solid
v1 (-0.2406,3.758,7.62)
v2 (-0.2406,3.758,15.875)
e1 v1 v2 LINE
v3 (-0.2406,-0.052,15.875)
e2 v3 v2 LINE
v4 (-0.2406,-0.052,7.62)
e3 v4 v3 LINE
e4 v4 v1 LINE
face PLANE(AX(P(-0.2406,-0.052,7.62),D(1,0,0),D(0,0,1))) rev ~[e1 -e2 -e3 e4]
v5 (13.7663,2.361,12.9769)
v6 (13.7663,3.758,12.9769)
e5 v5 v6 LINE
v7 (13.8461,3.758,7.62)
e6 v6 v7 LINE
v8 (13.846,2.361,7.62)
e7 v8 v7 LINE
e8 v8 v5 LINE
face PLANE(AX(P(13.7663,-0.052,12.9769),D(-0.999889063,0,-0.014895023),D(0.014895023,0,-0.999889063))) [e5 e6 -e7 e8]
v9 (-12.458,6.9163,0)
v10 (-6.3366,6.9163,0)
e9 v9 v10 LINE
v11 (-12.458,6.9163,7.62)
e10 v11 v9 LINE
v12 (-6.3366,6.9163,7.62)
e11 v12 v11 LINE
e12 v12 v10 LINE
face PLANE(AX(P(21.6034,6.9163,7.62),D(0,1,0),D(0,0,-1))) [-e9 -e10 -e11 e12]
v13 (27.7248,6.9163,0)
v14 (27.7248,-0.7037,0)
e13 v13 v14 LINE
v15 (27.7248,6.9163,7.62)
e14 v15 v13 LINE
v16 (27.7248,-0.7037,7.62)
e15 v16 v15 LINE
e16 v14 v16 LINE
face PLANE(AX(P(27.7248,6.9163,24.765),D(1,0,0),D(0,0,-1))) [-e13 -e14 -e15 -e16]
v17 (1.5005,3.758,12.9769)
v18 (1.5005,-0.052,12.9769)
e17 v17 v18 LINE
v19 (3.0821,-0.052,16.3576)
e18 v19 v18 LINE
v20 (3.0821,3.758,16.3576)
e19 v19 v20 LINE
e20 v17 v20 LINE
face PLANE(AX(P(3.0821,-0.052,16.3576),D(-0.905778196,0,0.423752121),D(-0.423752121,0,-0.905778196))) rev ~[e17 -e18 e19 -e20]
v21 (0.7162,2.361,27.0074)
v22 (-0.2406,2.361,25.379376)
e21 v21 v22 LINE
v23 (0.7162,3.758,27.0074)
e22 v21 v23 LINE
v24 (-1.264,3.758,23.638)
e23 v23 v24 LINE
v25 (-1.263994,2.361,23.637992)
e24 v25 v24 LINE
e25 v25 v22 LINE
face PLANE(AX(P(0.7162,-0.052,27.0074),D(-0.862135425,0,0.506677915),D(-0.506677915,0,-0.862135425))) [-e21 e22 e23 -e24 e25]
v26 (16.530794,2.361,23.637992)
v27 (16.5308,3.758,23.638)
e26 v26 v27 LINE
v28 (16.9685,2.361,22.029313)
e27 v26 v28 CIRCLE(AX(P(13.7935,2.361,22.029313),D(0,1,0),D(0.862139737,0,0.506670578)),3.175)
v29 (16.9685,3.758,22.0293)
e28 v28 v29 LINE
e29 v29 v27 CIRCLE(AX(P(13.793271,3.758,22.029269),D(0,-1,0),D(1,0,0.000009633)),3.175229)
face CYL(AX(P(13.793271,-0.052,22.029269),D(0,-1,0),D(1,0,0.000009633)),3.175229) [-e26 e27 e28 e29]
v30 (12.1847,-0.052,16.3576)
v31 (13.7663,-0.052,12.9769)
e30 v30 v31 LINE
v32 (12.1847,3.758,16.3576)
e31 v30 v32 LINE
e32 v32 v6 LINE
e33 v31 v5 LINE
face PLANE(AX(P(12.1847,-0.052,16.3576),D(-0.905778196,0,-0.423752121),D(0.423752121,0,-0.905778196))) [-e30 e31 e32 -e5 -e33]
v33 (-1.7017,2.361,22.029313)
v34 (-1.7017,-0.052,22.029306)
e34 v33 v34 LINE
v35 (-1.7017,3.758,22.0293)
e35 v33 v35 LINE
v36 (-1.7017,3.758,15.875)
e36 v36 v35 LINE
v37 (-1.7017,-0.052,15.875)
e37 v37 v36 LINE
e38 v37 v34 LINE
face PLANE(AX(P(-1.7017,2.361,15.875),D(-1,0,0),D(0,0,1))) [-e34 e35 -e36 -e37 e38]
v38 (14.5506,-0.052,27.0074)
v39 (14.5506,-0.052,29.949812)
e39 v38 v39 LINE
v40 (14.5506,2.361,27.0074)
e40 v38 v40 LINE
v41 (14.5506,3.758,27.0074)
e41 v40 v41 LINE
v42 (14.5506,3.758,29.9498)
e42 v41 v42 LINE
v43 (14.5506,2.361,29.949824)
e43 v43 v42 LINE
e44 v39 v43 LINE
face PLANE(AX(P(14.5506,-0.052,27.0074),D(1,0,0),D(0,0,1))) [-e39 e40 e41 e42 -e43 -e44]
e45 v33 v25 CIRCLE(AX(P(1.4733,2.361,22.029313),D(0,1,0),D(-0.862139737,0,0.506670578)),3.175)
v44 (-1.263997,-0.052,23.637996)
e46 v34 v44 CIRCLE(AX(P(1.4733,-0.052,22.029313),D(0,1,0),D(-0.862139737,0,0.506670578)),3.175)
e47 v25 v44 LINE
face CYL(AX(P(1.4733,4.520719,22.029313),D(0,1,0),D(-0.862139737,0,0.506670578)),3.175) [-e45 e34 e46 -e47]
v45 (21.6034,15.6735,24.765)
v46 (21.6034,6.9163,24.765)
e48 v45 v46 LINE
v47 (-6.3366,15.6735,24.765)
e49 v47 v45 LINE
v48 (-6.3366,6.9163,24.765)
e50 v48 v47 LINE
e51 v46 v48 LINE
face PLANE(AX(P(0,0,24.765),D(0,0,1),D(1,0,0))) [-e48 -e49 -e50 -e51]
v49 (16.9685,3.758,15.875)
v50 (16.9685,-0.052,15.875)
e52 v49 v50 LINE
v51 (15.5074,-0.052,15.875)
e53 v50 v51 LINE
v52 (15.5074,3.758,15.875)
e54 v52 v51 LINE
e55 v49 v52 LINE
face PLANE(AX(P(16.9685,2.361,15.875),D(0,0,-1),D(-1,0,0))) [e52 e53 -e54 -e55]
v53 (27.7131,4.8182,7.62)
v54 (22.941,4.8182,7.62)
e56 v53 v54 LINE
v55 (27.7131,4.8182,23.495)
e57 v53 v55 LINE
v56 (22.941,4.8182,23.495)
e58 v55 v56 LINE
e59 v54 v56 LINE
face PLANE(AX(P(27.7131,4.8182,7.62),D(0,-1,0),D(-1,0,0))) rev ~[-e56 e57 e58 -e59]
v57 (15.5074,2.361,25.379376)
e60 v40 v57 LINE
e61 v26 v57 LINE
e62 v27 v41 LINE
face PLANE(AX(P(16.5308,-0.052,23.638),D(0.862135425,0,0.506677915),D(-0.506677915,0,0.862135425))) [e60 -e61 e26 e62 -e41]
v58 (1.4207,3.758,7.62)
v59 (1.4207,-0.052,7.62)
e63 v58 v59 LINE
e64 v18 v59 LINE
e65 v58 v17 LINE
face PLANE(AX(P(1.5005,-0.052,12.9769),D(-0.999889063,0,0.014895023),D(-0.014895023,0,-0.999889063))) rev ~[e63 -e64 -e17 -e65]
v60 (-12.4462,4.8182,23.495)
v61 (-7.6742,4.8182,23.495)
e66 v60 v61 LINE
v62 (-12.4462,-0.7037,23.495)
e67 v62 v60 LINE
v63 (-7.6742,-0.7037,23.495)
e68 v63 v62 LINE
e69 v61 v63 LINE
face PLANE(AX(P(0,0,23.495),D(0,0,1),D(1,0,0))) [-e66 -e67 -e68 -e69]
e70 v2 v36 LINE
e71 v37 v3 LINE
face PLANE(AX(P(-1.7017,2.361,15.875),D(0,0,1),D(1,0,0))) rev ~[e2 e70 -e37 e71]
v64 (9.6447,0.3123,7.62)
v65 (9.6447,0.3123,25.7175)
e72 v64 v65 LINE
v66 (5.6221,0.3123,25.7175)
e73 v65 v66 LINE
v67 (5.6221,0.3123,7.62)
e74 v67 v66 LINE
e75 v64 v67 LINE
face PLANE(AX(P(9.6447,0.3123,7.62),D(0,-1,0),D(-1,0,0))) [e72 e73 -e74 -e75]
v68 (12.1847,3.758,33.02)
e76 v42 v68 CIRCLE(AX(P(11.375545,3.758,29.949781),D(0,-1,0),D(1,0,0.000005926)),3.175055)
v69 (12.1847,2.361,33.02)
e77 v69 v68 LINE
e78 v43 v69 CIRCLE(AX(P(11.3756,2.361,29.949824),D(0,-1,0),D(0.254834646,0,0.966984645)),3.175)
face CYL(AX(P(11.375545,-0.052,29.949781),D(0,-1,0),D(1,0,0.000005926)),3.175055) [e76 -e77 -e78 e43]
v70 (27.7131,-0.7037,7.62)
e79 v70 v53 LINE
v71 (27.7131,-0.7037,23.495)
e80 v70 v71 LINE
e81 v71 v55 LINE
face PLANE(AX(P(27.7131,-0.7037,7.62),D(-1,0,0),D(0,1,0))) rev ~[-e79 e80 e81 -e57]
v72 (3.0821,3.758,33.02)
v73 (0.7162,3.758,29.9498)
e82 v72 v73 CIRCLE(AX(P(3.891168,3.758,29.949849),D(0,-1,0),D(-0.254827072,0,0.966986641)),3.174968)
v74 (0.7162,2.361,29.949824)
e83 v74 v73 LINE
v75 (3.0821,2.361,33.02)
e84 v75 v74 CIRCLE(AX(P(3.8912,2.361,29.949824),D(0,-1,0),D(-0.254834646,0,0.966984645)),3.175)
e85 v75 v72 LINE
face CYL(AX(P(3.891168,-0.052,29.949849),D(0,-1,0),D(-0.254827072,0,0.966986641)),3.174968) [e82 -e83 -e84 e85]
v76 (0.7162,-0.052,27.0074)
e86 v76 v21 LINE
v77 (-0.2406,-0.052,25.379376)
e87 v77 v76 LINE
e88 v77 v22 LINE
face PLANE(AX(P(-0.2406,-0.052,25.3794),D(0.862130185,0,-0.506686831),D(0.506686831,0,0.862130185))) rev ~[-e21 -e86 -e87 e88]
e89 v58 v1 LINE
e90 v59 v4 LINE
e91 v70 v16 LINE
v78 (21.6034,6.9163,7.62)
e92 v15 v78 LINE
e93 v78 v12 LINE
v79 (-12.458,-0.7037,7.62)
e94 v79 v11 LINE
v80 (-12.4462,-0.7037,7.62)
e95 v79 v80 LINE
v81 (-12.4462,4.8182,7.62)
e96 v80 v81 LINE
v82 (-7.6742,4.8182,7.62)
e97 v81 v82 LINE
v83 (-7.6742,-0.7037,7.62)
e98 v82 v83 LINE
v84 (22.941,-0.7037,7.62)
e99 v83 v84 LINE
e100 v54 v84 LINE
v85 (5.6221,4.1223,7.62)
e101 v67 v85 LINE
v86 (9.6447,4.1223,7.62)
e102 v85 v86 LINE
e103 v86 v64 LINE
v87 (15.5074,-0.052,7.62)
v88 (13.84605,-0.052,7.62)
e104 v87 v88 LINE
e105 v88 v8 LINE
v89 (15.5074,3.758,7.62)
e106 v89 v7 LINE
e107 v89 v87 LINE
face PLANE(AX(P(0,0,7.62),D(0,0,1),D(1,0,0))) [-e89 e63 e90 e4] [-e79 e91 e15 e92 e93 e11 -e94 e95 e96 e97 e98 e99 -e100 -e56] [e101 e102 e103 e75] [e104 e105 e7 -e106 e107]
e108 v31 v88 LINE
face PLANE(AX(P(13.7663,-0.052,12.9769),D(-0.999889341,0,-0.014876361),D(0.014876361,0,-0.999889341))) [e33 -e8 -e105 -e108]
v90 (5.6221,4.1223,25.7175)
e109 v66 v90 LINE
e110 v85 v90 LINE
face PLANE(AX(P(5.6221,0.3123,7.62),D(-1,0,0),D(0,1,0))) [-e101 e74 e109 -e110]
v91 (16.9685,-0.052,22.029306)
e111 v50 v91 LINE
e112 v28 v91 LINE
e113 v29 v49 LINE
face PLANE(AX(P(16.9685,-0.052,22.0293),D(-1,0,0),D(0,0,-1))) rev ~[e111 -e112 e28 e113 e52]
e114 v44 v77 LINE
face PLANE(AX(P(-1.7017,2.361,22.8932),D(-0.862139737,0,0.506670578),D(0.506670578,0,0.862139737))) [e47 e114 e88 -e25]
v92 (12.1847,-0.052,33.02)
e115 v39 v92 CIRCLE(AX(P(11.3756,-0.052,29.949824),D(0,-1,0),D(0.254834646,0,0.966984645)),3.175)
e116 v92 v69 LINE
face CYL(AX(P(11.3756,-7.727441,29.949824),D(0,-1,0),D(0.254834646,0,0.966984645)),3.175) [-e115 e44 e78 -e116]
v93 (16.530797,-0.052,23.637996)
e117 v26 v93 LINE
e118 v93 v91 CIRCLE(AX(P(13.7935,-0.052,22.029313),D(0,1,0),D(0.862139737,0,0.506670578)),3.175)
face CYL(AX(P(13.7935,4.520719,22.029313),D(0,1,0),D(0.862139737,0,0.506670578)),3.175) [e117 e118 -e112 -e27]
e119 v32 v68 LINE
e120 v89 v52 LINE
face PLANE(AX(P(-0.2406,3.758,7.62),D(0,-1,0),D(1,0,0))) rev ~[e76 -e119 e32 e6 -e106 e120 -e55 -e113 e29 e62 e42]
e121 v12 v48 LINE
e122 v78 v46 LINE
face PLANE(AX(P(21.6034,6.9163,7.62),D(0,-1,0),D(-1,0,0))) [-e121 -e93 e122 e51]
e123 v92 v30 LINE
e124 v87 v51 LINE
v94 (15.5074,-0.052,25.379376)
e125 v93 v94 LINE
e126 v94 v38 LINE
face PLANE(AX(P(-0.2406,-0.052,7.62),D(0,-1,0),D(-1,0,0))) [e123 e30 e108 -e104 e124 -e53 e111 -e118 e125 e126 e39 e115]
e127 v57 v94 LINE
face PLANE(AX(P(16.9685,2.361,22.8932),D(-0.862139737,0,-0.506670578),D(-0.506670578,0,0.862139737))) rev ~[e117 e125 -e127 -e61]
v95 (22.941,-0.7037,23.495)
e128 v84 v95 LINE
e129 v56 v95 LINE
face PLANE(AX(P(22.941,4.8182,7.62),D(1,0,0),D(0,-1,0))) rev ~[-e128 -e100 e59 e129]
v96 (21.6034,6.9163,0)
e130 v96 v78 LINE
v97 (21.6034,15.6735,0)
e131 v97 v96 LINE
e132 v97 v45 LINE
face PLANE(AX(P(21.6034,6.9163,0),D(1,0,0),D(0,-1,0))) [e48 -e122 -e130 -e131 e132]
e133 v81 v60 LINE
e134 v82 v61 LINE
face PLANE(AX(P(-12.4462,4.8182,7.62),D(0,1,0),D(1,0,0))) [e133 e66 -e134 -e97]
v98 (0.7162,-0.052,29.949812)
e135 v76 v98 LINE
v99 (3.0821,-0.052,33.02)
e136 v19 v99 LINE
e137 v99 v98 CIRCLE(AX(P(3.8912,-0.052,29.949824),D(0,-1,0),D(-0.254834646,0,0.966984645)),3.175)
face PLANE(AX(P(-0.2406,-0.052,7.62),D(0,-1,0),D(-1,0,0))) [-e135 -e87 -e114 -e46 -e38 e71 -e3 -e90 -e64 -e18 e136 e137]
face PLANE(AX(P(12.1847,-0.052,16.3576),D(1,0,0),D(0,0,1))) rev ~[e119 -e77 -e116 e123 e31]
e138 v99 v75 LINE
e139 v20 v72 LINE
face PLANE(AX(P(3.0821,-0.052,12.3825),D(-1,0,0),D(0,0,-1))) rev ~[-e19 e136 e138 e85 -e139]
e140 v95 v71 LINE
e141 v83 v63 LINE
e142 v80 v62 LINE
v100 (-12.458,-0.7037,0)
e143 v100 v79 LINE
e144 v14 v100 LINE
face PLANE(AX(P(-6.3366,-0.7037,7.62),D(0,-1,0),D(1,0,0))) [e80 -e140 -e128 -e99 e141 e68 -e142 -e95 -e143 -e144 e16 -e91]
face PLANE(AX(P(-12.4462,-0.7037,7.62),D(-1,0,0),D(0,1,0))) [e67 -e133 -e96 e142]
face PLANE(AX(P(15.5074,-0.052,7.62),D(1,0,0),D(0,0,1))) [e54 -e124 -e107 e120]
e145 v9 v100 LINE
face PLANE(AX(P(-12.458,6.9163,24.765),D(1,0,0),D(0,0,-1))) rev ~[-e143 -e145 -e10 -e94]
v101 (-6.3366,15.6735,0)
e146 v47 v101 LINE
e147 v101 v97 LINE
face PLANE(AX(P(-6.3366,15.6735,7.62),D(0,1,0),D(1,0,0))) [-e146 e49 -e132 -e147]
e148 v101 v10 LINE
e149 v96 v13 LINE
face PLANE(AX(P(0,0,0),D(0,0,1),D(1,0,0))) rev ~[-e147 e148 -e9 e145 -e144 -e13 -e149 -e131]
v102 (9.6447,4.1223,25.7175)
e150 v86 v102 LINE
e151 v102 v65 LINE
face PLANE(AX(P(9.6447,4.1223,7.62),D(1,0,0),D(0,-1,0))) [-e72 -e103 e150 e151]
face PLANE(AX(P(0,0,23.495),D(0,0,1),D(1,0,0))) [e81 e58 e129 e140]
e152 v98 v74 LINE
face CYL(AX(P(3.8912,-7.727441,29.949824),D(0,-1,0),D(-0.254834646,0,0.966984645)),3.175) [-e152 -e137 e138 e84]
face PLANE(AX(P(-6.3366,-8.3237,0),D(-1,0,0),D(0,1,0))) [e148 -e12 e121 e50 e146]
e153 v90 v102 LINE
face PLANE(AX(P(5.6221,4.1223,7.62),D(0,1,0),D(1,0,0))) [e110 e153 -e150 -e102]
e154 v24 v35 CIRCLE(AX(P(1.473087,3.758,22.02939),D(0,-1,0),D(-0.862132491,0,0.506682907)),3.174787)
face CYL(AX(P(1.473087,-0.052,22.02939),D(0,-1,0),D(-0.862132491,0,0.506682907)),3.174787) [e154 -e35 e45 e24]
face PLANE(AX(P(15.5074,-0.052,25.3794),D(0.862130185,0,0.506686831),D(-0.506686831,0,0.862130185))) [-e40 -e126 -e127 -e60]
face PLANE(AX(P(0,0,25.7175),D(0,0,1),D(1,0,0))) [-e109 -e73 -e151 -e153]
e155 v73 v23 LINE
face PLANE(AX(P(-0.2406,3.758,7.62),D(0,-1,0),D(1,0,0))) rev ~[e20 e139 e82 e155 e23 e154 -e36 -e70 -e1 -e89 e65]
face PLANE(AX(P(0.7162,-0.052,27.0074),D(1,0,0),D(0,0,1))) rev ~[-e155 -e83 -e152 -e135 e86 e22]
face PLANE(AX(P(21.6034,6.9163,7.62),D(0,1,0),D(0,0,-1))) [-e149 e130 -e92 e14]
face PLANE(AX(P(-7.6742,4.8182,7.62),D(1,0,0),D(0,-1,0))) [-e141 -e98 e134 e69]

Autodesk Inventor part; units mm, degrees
ref_plane "YZ Plane" through (0, 0, 0) normal (1, 0, 0) x (0, 1, 0)
ref_plane "XZ Plane" through (0, 0, 0) normal (0, 1, 0) x (-1, 0, 0)
ref_plane "XY Plane" through (0, 0, 0) normal (0, 0, 1) x (1, 0, 0)
sketch "Sketch1" plane through (0, 0, 0) normal (0, 0, 1) x (1, 0, 0)
  line L0 (-6.3366, 6.9163) -> (21.6034, 6.9163)
  line L1 (21.6034, 6.9163) -> (21.6034, -8.3237)
  line L2 (21.6034, -8.3237) -> (-6.3366, -8.3237)
  line L3 (-6.3366, -8.3237) -> (-6.3366, 6.9163)
  point P0 (0, 0)
  dimension "d0" = 27.94
  dimension "d1" = 15.24
extrude "Extrusion1" add sketch "Sketch1" along normal blind 7.62
sketch "Sketch2" plane through (0, 0, 7.62) normal (0, 0, 1) x (1, 0, 0)
  line L0 (-6.3366, 6.9163) -> (-6.3366, -8.3237) projected
  line L1 (21.6034, -8.3237) -> (21.6034, 6.9163) projected
  line L2 (21.6034, -0.052) -> (21.6034, 2.361)
  line L3 (-6.3366, 2.361) -> (-6.3366, -0.052)
  line L4 (21.6034, 6.9163) -> (-6.3366, 6.9163) projected
  line L5 (-6.3366, -8.3237) -> (21.6034, -8.3237) projected
  line L6 (0.9631, 2.361) -> (-0.2406, 2.361)
  line L7 (-0.2406, -0.052) -> (0.9631, -0.052)
  line L8 (-0.2406, -0.052) -> (-0.2406, 2.361)
  line L9 (-0.2406, -0.052) -> (3.0821, -0.052)
  line L10 (3.0821, -0.052) -> (3.0821, 2.361)
  line L11 (3.0821, 2.361) -> (-0.2406, 2.361)
  line L12 (-0.2406, 2.361) -> (-0.2406, -0.052)
  line L13 (14.3038, 2.361) -> (15.5074, 2.361)
  line L14 (15.5074, -0.052) -> (14.3038, -0.052)
  line L15 (15.5074, -0.052) -> (15.5074, 2.361)
  line L16 (15.5074, -0.052) -> (12.1847, -0.052)
  line L17 (12.1847, -0.052) -> (12.1847, 2.361)
  line L18 (12.1847, 2.361) -> (15.5074, 2.361)
  line L19 (15.5074, 2.361) -> (15.5074, -0.052)
  line L20 (-6.3366, -0.7037) -> (21.6034, -0.7037)
  line L21 (-6.3366, 2.361) -> (21.6034, 2.361)
  line L22 (21.6034, 2.361) -> (21.6034, -0.052)
  line L23 (21.6034, -0.052) -> (-6.3366, -0.052)
  line L24 (-6.3366, -0.052) -> (-6.3366, 2.361)
  point P0 (0, 0)
  point P1 (-0.2406, 1.1545)
  point P2 (15.2669, -0.3643)
  point P3 (15.5074, 1.1545)
  point P4 (15.5074, -0.052)
  point P5 (21.6034, -0.052)
  point P6 (15.5074, 2.361)
  point P7 (-6.3366, -0.052)
  point P8 (-0.2406, -0.052)
  point P9 (-0.2406, 2.361)
  point P10 (-6.3366, 2.361)
  point P11 (3.0821, -0.052)
  point P12 (12.1847, -0.052)
  point P13 (12.1847, 2.361)
  point P14 (3.0821, 2.361)
  dimension "d6" = 6.096
extrude "Extrusion2" add sketch "Sketch2" along normal blind 8.7376 contours L6 L11 L10 L9 L7 L8 | L15 L14 L16 L17 L18 L13
sketch "Sketch3" plane through (-0.2406, 2.361, 7.62) normal (0, 1, 0) x (1, 0, 0)
  line L0 (3.3227, -8.7376) -> (0, -8.7376) projected
  line L1 (-6.096, 7.62) -> (21.844, 7.62) projected
  line L2 (3.3227, -11.3552) -> (3.3227, -8.7376)
  line L3 (12.4253, -11.3552) -> (12.4253, -8.7376)
  line L4 (17.2091, -8.255) -> (17.2091, -15.2732)
  line L5 (17.2091, -15.2732) -> (14.9854, -19.057)
  line L6 (14.9854, -19.057) -> (12.4253, -19.057)
  line L7 (12.4253, -19.057) -> (12.4253, -8.7376)
  line L8 (7.874, 7.62) -> (7.874, -24.8322)
  line L9 (3.3227, -11.3552) -> (3.3227, -8.7376)
  line L10 (-1.4611, -8.255) -> (-1.4611, -15.2732)
  line L11 (-1.4611, -15.2732) -> (0.7626, -19.057)
  line L12 (0.7626, -19.057) -> (3.3227, -19.057)
  line L13 (3.3227, -19.057) -> (3.3227, -8.7376)
  line L14 (17.2091, -8.255) -> (12.4253, -8.255)
  line L15 (12.4253, 0) -> (12.4253, -8.7376) projected
  line L16 (12.4253, -8.255) -> (12.4253, -8.7376)
  line L17 (-1.4611, -8.255) -> (3.3227, -8.255)
  line L18 (3.3227, 0) -> (3.3227, -8.7376) projected
  line L19 (3.3227, -8.255) -> (3.3227, -8.7376)
  point P0 (0.2406, 7.62)
extrude "Extrusion4" add sketch "Sketch2" along normal blind 25.4 contours L6 L11 L10 L9 L7 L8 | L15 L14 L16 L17 L18 L13
sketch "Sketch4" plane through (-6.3366, 6.9163, 0) normal (0, 1, 0) x (1, 0, 0)
  point P0 (6.3366, 0)
sketch "Sketch5" plane through (0, 0, 7.62) normal (0, 0, 1) x (1, 0, 0)
  line L0 (21.6034, 6.9163) -> (-6.3366, 6.9163) projected
  line L1 (-6.3366, 15.6735) -> (21.6034, 15.6735)
  line L2 (21.6034, 15.6735) -> (21.6034, 6.9163)
  line L3 (21.6034, 6.9163) -> (-6.3366, 6.9163)
  line L4 (-6.3366, 6.9163) -> (-6.3366, 15.6735)
  point P0 (0, 0)
extrude "Extrusion5" add sketch "Sketch5" along normal blind 17.145 and the other way blind 7.62
extrude "Extrusion6" cut sketch "Sketch2" against normal blind 25.4 contours L20 L1 L5 L0
extrude "Extrusion7" add sketch "Sketch2" along normal blind 4.7625 contours L21 L8 L23 L0 | L1 L23 L15 L21 | L21 L17 L23 L10
extrude "Extrusion8" add sketch "Sketch3" against normal up to surface (2.413 mm away)
sketch "Sketch6" plane through (-6.3366, -0.052, 7.62) normal (0, -1, 0) x (1, 0, 0)
  line L0 (27.94, 0) -> (27.94, 4.7625) projected
  line L1 (21.844, 4.7625) -> (21.844, 8.255) projected
  line L2 (27.94, 0) -> (21.844, 0)
  line L3 (21.844, 0) -> (21.844, 4.7625)
  line L4 (21.844, 4.7625) -> (27.94, 4.7625)
  line L5 (27.94, 4.7625) -> (27.94, 0)
  line L6 (18.5213, 4.7625) -> (18.5213, 25.4) projected
  line L7 (18.5213, 4.7625) -> (9.4187, 4.7625)
  line L8 (9.4187, 4.7625) -> (9.4187, 0)
  line L9 (9.4187, 0) -> (18.5213, 0)
  line L10 (18.5213, 0) -> (18.5213, 4.7625)
  line L11 (6.096, 4.7625) -> (6.096, 8.255) projected
  line L12 (0, 0) -> (0, 4.7625) projected
  line L13 (6.096, 4.7625) -> (0, 4.7625)
  line L14 (0, 4.7625) -> (0, 0)
  line L15 (0, 0) -> (6.096, 0)
  line L16 (6.096, 0) -> (6.096, 4.7625)
  point P0 (6.3366, -7.62)
  point P1 (21.844, 8.7376)
  point P2 (18.5213, 19.057)
  point P3 (6.096, 8.7376)
extrude "Extrusion9" cut sketch "Sketch6" against normal up to surface (6.9683 mm away)
sketch "Sketch7" plane through (12.1847, -0.052, 7.62) normal (0, -1, 0) x (1, 0, 0)
  line L0 (3.3227, 17.7594) -> (4.7838, 15.2732) projected
  line L1 (3.3227, 17.7594) -> (2.3659, 19.3874)
  line L2 (2.3659, 19.3874) -> (2.3659, 25.4)
  line L3 (3.3227, 25.4) -> (0, 25.4) projected
  line L4 (3.3227, 17.7594) -> (3.3227, 25.4) projected
  line L5 (2.3659, 25.4) -> (3.3227, 25.4)
  line L6 (3.3227, 25.4) -> (3.3227, 17.7594)
  line L7 (-18.5213, -7.62) -> (9.4187, -7.62) projected
  line L8 (-12.4253, 17.7594) -> (-11.4685, 19.3874)
  line L9 (-11.4685, 19.3874) -> (-11.4685, 25.4)
  line L10 (-12.4253, 17.7594) -> (-12.4253, 25.4)
  line L11 (-11.4685, 25.4) -> (-12.4253, 25.4)
  line L12 (-12.4253, 25.4) -> (-12.4253, 17.7594)
  line L13 (-12.4253, 8.7376) -> (-13.8865, 8.255) projected
  line L14 (-9.1825, 8.7376) -> (-9.1026, 8.7376)
  line L15 (-9.1026, 0) -> (-9.1026, 25.4) projected
  line L16 (-10.6842, 5.3569) -> (-10.764, 0)
  line L17 (-9.1026, 0) -> (-12.4253, 0) projected
  line L18 (-9.1026, 0) -> (-9.1026, 8.7376)
  line L19 (-10.764, 0) -> (-9.1026, 0)
  line L20 (9.4187, -7.62) -> (-18.5213, -7.62) projected
  line L21 (-18.5213, 17.145) -> (9.4187, 17.145) projected
  line L22 (1.5816, 5.3569) -> (1.6613, 0)
  line L23 (1.6613, 0) -> (0, 0)
  line L24 (0, 0) -> (0, 8.7376)
  line L25 (-4.5513, -7.62) -> (-4.5513, 0)
  line L26 (-4.5513, 11.274) -> (-4.5513, 11.3382)
  line L27 (-9.1026, 8.7376) -> (-10.6842, 5.3569)
  line L28 (0, 8.7376) -> (1.5816, 5.3569)
  point P0 (-12.1847, -7.62)
extrude "Extrusion10" cut sketch "Sketch7" against normal up to surface (6.9683 mm away)
fillet "Fillet1" radius 3.175 4 edges at (0.7162, 1.1545, 33.02) (14.5507, 1.1545, 33.02) (16.9686, 1.1545, 22.8932) (-1.7017, 1.1545, 22.8932)
sketch "Sketch8" plane through (-0.2406, -0.052, 7.62) normal (0, -1, 0) x (1, 0, 0)
  arc A0 (-1.0234, 16.018) -> (-1.4611, 14.4093) centre (1.7139, 14.4093) ccw projected
  line L0 (-1.4611, 8.255) -> (-1.4611, 14.4093) projected
  line L1 (0, 0) -> (0, 8.255) projected
  line L2 (1.6613, 0) -> (0, 0) projected
  line L3 (1.6613, 0) -> (1.7411, 5.3569) projected
  line L4 (1.7411, 5.3569) -> (3.3227, 8.7376) projected
  line L5 (3.3227, 8.7376) -> (3.3227, 25.4) projected
  arc A1 (3.3227, 25.4) -> (0.9568, 22.3298) centre (4.1318, 22.3298) ccw projected
  line L6 (0.9568, 22.3298) -> (0.9568, 19.3874) projected
  line L7 (0.9568, 19.3874) -> (-1.0234, 16.018) projected
  arc A2 (17.2091, 14.4093) -> (16.7714, 16.018) centre (14.0341, 14.4093) ccw projected
  line L8 (16.7714, 16.018) -> (14.7912, 19.3874) projected
  line L9 (14.7912, 19.3874) -> (14.7912, 22.3298) projected
  arc A3 (14.7912, 22.3298) -> (12.4253, 25.4) centre (11.6162, 22.3298) ccw projected
  line L10 (12.4253, 8.7376) -> (12.4253, 25.4) projected
  line L11 (12.4253, 8.7376) -> (14.0069, 5.3569) projected
  line L12 (14.0069, 5.3569) -> (14.0867, 0) projected
  line L13 (15.748, 0) -> (14.0867, 0) projected
  line L14 (15.748, 0) -> (15.748, 8.255) projected
  line L15 (17.2091, 14.4093) -> (17.2091, 8.255) projected
  line L16 (17.2091, 8.255) -> (15.748, 8.255) projected
  line L17 (0, 8.255) -> (-1.4611, 8.255) projected
  point P0 (0.2406, -7.62)
extrude "Extrusion11" add sketch "Sketch8" against normal blind 3.81
sketch "Sketch9" plane through (0, 0, 7.62) normal (0, 0, 1) x (1, 0, 0)
  line L0 (9.6447, 0.3123) -> (5.6221, 0.3123)
  line L1 (5.6221, 0.3123) -> (5.6221, 4.1223)
  line L2 (5.6221, 4.1223) -> (9.6447, 4.1223)
  line L3 (9.6447, 4.1223) -> (9.6447, 0.3123)
  line L4 (12.1847, -0.052) -> (12.1847, 3.758) projected
  line L5 (3.0821, -0.052) -> (3.0821, 3.758) projected
  point P0 (0, 0)
  dimension "d30" = 2.54
  dimension "d31" = 2.54
extrude "Extrusion12" add sketch "Sketch9" along normal blind 18.0975
sketch "Sketch10" plane through (21.6034, 6.9163, 24.765) normal (1, 0, 0) x (0, 0, -1)
  line L0 (17.145, 0) -> (0, 0) projected
  line L1 (24.765, -7.62) -> (17.145, -7.62) projected
  line L2 (17.145, 0) -> (24.765, 0)
  line L3 (24.765, 0) -> (24.765, -7.62)
  line L4 (24.765, -7.62) -> (17.145, -7.62)
  line L5 (17.145, -7.62) -> (17.145, 0)
  point P0 (24.765, -6.9163)
extrude "Extrusion13" add sketch "Sketch10" along normal blind 6.1214 and the other way blind 34.0614
sketch "Sketch11" plane through (0, 0, 7.62) normal (0, 0, 1) x (1, 0, 0)
  line L0 (21.6034, 15.6735) -> (-6.3366, 15.6735) projected
  line L1 (9.6447, 0.3123) -> (5.6221, 0.3123) projected
  line L2 (-12.458, -0.7037) -> (-12.458, 6.9163) projected
  line L3 (-12.458, -0.7037) -> (27.7248, -0.7037) projected
  line L4 (-11.1046, -0.7037) -> (-12.458, -0.7037)
  line L5 (-12.458, -0.7037) -> (-12.458, 4.1961)
  line L6 (21.6034, -0.7037) -> (27.7131, -0.7037)
  line L7 (27.7131, -0.7037) -> (27.7131, 4.8182)
  line L8 (27.7131, 4.8182) -> (22.941, 4.8182)
  line L9 (21.6034, 4.8182) -> (21.6034, -0.7037)
  line L10 (-6.3366, -0.7037) -> (-12.4462, -0.7037)
  line L11 (-12.4462, -0.7037) -> (-12.4462, 4.8182)
  line L12 (-12.4462, 4.8182) -> (-7.6742, 4.8182)
  line L13 (-6.3366, 4.8182) -> (-6.3366, -0.7037)
  line L14 (21.6034, 6.9163) -> (27.7248, 6.9163) projected
  line L15 (22.941, 4.8182) -> (22.941, -0.7037)
  line L16 (7.6334, 0.3123) -> (7.6334, -0.7037)
  line L17 (-7.6742, 4.8182) -> (-7.6742, -0.7037)
  point P0 (0, 0)
  point P1 (22.941, 6.9163)
  point P2 (-7.6742, 6.9163)
  point P3 (-7.6742, -0.7037)
extrude "Extrusion14" add sketch "Sketch11" along normal blind 15.875
properties part number "Attachment6"
